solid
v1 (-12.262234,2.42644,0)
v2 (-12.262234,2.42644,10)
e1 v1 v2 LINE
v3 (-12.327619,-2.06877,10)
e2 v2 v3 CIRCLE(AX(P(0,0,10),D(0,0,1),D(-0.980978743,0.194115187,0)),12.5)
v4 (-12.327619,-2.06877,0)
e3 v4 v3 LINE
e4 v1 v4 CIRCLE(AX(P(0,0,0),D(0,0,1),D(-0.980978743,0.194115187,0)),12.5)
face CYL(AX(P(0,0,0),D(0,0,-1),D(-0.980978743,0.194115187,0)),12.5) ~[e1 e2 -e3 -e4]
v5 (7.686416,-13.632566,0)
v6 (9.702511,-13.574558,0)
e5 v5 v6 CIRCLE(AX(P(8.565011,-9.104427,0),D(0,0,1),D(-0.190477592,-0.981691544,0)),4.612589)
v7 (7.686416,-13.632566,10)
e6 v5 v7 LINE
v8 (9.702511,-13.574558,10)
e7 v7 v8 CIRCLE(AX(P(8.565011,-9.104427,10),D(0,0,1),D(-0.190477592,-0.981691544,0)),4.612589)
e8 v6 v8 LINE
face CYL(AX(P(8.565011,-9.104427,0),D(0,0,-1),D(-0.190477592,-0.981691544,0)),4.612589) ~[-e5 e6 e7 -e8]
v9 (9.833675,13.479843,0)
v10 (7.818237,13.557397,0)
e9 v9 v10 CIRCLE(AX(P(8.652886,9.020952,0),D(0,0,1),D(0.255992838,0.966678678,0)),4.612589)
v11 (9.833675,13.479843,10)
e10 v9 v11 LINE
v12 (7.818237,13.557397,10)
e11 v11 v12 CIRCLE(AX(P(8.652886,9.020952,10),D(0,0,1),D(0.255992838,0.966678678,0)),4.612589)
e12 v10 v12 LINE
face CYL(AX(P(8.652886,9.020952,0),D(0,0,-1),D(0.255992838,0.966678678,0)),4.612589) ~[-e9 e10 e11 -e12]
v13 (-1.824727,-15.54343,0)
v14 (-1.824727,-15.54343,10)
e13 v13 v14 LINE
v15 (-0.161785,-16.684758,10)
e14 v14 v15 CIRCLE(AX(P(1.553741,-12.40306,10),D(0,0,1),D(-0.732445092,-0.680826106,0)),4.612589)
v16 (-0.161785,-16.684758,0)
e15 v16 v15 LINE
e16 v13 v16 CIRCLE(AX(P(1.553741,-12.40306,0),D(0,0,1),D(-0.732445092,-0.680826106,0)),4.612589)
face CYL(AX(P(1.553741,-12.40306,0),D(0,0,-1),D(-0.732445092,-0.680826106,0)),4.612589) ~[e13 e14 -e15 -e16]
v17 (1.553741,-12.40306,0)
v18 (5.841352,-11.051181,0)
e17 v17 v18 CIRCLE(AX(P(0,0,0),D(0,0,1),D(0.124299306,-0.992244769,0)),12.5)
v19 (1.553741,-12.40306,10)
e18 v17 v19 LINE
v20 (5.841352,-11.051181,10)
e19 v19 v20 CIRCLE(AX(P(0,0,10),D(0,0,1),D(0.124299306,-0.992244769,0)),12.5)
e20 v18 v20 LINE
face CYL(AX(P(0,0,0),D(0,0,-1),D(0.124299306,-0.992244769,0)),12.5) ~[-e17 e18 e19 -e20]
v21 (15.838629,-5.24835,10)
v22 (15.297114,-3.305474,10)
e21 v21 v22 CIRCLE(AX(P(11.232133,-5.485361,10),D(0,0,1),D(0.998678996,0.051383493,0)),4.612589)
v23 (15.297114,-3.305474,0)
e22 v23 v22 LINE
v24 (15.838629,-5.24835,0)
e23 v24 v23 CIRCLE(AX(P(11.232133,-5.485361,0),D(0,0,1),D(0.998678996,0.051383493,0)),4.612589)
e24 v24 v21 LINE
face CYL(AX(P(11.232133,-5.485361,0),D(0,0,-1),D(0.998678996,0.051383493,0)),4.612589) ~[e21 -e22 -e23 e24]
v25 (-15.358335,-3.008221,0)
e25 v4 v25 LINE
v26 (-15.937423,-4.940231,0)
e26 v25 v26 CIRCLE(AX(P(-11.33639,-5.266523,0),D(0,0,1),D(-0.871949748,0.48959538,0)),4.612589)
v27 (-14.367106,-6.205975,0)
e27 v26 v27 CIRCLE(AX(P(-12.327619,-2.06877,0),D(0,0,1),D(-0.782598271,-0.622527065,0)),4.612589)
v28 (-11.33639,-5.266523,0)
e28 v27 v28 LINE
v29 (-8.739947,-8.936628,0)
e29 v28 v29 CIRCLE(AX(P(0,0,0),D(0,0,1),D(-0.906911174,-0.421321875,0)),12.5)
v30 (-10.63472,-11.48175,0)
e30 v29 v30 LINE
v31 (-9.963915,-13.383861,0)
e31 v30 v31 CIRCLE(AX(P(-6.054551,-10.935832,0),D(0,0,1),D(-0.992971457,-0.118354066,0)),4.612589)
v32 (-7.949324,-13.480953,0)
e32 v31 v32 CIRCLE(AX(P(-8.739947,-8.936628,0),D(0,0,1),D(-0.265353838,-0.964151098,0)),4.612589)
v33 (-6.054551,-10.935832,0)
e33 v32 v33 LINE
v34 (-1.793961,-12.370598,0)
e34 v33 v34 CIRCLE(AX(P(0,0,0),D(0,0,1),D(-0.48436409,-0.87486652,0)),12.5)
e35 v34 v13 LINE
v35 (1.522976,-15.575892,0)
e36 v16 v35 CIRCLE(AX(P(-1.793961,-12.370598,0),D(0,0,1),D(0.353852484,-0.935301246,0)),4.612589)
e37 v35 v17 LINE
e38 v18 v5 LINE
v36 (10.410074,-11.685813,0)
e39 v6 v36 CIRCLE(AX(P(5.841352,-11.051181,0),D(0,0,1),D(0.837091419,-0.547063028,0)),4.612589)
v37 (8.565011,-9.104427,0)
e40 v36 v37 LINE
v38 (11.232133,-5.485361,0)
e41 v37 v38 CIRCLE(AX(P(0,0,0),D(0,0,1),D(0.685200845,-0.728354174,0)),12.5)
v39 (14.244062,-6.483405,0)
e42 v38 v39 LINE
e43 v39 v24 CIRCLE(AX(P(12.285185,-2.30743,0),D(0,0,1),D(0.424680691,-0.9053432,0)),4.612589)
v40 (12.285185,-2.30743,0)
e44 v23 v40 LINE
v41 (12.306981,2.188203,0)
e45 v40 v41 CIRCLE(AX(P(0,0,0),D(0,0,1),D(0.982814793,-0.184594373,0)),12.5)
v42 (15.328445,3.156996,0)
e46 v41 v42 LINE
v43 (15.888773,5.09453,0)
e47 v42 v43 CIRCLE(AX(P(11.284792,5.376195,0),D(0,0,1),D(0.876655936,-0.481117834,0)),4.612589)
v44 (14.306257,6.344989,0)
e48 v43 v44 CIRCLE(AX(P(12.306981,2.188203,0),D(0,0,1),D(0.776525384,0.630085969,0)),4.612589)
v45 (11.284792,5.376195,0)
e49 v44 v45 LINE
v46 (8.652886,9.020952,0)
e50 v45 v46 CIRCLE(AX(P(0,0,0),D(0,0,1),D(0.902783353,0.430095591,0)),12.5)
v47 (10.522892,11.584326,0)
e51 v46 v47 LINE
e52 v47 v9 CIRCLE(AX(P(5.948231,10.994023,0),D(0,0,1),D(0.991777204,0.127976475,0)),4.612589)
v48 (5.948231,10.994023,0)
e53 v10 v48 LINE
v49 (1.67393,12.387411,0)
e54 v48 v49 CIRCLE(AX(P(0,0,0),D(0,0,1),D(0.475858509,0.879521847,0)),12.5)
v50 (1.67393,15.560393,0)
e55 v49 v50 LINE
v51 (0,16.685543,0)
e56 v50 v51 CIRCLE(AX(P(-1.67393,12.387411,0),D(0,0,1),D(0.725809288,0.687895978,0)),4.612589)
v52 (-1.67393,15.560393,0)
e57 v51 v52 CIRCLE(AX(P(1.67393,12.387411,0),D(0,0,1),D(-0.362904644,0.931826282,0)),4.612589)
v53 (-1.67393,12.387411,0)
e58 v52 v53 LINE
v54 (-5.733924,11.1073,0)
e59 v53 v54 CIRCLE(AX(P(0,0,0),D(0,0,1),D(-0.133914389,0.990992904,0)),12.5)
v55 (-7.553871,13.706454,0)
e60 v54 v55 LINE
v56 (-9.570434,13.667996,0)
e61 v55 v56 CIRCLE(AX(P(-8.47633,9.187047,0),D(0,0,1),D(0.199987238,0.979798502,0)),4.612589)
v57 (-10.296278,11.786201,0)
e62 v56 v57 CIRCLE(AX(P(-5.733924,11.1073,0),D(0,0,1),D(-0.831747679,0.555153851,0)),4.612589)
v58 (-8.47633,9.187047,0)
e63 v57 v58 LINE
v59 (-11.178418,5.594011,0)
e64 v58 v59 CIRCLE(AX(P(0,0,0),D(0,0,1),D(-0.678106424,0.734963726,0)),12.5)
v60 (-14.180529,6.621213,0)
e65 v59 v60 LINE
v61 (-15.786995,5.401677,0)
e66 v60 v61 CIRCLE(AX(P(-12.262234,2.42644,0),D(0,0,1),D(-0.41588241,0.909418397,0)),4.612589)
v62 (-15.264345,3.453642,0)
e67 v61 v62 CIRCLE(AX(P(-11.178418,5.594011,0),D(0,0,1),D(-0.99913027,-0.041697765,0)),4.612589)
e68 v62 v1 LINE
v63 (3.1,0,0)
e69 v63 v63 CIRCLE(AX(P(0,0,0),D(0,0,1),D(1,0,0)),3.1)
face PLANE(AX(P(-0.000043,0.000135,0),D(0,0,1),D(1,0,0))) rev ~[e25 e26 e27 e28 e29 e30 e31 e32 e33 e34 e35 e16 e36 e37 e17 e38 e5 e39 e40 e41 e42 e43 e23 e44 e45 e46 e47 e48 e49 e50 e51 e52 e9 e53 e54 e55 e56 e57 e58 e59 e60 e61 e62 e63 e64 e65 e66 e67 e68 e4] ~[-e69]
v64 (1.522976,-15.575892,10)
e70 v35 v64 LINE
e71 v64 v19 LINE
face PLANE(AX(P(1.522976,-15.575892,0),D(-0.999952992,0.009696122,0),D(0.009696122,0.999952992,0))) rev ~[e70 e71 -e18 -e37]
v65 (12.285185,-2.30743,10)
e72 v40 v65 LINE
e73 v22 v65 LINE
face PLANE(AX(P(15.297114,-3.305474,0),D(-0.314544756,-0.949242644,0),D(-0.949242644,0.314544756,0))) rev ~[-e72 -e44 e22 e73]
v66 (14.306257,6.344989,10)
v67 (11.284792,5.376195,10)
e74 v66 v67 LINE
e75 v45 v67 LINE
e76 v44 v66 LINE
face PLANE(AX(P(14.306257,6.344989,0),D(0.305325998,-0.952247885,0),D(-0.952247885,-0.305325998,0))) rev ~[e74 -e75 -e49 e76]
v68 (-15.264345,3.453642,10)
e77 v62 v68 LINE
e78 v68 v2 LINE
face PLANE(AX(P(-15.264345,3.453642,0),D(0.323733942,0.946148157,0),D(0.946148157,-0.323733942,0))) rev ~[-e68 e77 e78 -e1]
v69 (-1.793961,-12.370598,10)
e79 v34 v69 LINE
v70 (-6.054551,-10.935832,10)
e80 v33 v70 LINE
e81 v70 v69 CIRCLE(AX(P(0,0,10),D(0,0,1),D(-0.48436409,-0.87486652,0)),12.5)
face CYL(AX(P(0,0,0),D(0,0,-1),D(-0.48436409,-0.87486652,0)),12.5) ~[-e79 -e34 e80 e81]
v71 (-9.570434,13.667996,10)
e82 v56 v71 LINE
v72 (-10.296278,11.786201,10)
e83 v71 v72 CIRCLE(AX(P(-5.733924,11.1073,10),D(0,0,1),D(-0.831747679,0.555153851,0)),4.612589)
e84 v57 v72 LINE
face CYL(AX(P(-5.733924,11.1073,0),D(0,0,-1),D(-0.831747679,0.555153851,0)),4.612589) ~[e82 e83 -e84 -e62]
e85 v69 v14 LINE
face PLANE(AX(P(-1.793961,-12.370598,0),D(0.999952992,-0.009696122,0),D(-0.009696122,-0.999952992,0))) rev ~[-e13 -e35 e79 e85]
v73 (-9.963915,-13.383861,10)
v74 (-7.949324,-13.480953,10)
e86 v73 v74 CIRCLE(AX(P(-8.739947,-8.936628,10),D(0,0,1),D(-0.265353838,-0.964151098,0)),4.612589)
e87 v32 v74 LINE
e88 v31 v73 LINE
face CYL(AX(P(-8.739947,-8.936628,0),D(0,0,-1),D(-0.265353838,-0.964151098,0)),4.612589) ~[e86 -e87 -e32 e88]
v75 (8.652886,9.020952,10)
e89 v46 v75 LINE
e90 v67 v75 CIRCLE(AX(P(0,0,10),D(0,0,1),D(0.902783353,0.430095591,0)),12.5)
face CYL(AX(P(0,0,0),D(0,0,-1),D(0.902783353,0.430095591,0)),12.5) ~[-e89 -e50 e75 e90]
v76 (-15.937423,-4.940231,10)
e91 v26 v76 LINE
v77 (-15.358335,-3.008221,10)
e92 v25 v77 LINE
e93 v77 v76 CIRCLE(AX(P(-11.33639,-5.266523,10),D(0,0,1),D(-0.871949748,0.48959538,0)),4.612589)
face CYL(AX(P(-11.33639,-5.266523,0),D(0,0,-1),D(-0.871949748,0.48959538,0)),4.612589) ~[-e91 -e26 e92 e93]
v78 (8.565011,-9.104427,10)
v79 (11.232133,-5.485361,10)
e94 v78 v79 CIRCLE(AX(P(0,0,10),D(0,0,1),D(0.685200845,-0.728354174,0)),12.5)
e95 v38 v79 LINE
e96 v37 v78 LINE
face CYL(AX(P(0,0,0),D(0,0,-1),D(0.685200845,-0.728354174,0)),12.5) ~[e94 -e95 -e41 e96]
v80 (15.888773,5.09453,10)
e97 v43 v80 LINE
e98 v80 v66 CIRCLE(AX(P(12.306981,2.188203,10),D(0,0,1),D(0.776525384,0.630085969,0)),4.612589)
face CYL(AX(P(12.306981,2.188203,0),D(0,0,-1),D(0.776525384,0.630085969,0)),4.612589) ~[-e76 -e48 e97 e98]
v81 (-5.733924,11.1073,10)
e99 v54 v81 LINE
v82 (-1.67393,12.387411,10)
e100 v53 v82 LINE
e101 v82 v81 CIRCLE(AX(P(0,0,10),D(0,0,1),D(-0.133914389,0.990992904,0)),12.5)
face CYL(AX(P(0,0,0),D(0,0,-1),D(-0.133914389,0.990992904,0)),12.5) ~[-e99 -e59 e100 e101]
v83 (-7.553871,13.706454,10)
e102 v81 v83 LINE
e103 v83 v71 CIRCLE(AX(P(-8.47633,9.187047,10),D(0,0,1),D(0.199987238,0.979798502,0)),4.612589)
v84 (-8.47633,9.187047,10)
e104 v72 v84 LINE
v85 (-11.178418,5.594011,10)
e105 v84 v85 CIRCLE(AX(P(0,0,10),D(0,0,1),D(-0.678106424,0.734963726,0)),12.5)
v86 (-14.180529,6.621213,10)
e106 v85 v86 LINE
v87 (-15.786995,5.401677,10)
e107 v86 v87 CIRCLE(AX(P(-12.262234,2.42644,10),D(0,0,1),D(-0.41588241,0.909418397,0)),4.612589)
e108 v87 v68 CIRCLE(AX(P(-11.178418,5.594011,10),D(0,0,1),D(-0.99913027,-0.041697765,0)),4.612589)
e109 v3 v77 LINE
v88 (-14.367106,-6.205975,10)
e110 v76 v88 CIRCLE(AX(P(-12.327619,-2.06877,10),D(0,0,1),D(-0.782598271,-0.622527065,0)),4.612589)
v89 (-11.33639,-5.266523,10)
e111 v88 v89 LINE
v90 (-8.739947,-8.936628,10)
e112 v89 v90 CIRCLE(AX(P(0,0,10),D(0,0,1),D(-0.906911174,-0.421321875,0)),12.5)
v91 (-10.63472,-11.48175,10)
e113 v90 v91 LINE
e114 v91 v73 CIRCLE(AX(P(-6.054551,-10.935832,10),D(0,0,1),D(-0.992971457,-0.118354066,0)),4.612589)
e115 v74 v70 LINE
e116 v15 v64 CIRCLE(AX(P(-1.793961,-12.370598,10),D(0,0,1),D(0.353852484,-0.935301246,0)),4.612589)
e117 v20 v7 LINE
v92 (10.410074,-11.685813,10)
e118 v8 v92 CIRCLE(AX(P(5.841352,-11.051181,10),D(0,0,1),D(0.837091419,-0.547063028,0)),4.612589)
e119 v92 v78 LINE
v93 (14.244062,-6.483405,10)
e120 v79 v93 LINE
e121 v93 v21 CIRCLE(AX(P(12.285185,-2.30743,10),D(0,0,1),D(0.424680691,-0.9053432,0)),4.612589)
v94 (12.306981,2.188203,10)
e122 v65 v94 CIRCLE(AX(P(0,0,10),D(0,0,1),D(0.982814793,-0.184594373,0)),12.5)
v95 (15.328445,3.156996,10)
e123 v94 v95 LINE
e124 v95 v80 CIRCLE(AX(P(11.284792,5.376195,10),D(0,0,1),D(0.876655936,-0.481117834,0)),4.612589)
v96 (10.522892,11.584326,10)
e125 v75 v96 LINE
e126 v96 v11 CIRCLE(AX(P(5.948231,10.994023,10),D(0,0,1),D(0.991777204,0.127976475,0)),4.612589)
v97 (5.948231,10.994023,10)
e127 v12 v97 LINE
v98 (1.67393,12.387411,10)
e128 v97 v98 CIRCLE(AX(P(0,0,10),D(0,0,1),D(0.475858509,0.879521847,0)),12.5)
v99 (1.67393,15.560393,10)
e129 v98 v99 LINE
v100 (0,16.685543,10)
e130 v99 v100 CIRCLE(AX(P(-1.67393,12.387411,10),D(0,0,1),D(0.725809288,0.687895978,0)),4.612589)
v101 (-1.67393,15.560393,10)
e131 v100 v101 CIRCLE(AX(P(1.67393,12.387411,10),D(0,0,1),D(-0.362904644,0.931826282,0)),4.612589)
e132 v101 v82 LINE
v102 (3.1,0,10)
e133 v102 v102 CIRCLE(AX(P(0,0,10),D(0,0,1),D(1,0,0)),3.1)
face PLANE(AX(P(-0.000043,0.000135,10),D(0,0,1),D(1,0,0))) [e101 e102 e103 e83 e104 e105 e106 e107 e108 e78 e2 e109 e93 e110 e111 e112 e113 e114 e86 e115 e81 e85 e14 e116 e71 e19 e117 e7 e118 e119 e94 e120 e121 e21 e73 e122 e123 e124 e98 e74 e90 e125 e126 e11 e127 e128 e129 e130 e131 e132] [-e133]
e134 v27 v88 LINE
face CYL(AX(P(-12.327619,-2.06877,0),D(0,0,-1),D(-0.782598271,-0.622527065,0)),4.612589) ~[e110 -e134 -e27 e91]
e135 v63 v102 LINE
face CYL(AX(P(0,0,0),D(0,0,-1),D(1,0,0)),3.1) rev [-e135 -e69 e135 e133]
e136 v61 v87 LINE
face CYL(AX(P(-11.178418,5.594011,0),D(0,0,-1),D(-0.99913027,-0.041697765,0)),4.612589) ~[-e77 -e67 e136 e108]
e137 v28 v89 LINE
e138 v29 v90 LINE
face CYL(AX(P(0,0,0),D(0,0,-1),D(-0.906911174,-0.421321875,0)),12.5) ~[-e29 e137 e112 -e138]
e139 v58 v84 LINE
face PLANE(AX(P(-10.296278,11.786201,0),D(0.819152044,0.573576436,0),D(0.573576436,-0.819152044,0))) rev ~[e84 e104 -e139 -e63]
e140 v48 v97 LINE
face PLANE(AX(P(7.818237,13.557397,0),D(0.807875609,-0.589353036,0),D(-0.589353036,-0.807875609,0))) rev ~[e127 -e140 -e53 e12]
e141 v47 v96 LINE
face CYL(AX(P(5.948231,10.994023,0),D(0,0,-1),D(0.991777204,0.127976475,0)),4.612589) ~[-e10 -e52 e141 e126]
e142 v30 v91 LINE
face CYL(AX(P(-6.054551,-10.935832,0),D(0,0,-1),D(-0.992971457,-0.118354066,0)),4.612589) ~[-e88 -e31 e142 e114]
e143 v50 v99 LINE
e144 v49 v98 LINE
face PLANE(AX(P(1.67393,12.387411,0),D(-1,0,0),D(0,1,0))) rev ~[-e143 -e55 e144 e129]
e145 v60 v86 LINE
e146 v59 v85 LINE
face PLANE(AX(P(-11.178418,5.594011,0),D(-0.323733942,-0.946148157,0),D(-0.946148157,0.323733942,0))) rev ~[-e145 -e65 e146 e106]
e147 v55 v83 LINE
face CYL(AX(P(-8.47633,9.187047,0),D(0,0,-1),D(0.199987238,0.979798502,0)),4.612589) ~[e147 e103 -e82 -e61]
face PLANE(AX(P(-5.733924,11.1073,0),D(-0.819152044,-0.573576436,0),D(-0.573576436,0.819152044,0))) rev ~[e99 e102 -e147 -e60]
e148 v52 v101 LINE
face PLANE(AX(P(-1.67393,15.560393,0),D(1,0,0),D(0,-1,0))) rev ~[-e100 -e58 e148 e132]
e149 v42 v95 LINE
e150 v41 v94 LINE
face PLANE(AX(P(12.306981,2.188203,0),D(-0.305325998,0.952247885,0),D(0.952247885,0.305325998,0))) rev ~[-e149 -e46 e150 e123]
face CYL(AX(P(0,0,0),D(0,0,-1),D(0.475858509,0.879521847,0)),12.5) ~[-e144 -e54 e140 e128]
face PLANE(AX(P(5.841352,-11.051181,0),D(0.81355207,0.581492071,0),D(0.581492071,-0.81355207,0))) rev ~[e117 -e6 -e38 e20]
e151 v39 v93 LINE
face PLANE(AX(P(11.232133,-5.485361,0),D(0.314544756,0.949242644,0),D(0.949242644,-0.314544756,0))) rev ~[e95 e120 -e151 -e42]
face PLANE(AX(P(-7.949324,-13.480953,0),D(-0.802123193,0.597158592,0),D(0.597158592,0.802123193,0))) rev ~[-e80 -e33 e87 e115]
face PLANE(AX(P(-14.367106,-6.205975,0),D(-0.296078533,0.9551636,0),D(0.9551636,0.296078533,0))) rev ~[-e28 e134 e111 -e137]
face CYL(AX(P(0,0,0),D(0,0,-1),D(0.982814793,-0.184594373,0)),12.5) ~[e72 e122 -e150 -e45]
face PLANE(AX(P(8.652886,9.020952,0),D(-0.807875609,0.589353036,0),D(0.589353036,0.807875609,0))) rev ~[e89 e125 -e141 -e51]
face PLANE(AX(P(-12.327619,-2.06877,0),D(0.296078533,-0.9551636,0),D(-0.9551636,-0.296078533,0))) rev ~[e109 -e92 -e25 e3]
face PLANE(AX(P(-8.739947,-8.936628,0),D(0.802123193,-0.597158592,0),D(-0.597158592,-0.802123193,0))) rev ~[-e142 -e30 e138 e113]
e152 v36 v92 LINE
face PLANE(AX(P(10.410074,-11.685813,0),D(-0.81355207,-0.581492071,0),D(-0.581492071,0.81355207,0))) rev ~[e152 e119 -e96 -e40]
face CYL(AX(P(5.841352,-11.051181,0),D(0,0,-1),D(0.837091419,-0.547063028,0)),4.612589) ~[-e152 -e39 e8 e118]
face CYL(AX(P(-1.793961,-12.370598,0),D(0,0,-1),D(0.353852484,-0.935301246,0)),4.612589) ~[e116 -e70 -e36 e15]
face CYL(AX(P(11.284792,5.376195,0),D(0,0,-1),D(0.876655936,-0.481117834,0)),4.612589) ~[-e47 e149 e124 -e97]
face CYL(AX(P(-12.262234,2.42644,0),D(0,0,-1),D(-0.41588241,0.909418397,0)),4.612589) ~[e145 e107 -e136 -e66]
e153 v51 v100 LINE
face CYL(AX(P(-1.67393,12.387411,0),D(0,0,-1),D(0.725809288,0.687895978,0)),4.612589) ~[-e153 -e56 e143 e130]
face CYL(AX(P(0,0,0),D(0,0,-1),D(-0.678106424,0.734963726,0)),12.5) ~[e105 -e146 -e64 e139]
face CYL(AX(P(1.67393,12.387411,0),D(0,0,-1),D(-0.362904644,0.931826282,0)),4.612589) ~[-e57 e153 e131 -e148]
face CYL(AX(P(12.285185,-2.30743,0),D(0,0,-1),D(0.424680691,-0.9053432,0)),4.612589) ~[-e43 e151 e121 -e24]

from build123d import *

# Parameters (mm, degrees)
F0_R     = 3.1
F1_DEPTH = 10


with BuildPart() as f1:
    # F0 (on Top) → F1 (new body)
    with BuildSketch(Plane.XY):
        with BuildLine():
            ThreePointArc((1.673929859, 12.3874113045), (0, 12.5), (-1.673929859, 12.3874113045))
            ThreePointArc((-1.673929859, 12.3874113045), (-3.7588224938, 11.9214618844), (-5.7339241657, 11.1073000167))
            ThreePointArc((-5.7339241657, 11.1073000167), (-7.1697054544, 10.2394005536), (-8.4763302976, 9.1870465703))
            ThreePointArc((-8.4763302976, 9.1870465703), (-9.9902333855, 7.5130045191), (-11.1784184623, 5.5940111443))
            ThreePointArc((-11.1784184623, 5.5940111443), (-11.8268519609, 4.0466742757), (-12.2622342862, 2.4264398427))
            ThreePointArc((-12.2622342862, 2.4264398427), (-12.4986778991, 0.1817987206), (-12.3276190694, -2.0687697022))
            ThreePointArc((-12.3276190694, -2.0687697022), (-11.9395449954, -3.7009816676), (-11.336389674, -5.2665234414))
            ThreePointArc((-11.336389674, -5.2665234414), (-10.2045206414, -7.2192630149), (-8.7399470524, -8.9366283084))
            ThreePointArc((-8.7399470524, -8.9366283084), (-7.4644823963, -10.0265399094), (-6.0545511265, -10.9358315027))
            ThreePointArc((-6.0545511265, -10.9358315027), (-3.9892887467, -11.8463317232), (-1.7939610174, -12.3705983634))
            ThreePointArc((-1.7939610174, -12.3705983634), (-0.1212015211, -12.4994123938), (1.5537413227, -12.4030596186))
            ThreePointArc((1.5537413227, -12.4030596186), (3.7588224938, -11.9214618844), (5.8413523551, -11.0511810529))
            ThreePointArc((5.8413523551, -11.0511810529), (7.2686508911, -10.1694008783), (8.5650105596, -9.1044271711))
            ThreePointArc((8.5650105596, -9.1044271711), (10.0626107657, -7.4157848255), (11.2321331944, -5.4853608726))
            ThreePointArc((11.2321331944, -5.4853608726), (11.8655330447, -3.9318094519), (12.285184913, -2.3074296637))
            ThreePointArc((12.285184913, -2.3074296637), (12.4998530976, -0.0606014727), (12.3069805238, 2.188202547))
            ThreePointArc((12.3069805238, 2.188202547), (11.9030985667, 3.8165749712), (11.2847919153, 5.3761948838))
            ThreePointArc((11.2847919153, 5.3761948838), (10.1340420896, 7.3178679221), (8.6528855651, 9.0209518011))
            ThreePointArc((8.6528855651, 9.0209518011), (7.3669129512, 10.0984451065), (5.9482313582, 10.9940230903))
            ThreePointArc((5.9482313582, 10.9940230903), (3.8742377423, 11.8844554741), (1.673929859, 12.3874113045))
        make_face()
        Circle(F0_R, mode=Mode.SUBTRACT)
        with BuildLine():
            ThreePointArc((-12.2622342862, 2.4264398427), (-11.8268519609, 4.0466742757), (-11.1784184623, 5.5940111443))
            Line((-11.1784184623, 5.5940111443), (-14.1805287895, 6.6212128607))
            ThreePointArc((-14.1805287895, 6.6212128607), (-15.0512360756, 6.1003265438), (-15.786995451, 5.4016765064))
            ThreePointArc((-15.786995451, 5.4016765064), (-15.6334500279, 4.3987420438), (-15.2643446134, 3.4536415591))
            Line((-15.2643446134, 3.4536415591), (-12.2622342862, 2.4264398427))
        make_face()
        with BuildLine():
            ThreePointArc((-11.336389674, -5.2665234414), (-11.9395449954, -3.7009816676), (-12.3276190694, -2.0687697022))
            Line((-12.3276190694, -2.0687697022), (-15.3583352271, -3.0082213265))
            ThreePointArc((-15.3583352271, -3.0082213265), (-15.7547724734, -3.9421866593), (-15.9374230058, -4.9402310051))
            ThreePointArc((-15.9374230058, -4.9402310051), (-15.2222949332, -5.6599848332), (-14.3671058317, -6.2059750657))
            Line((-14.3671058317, -6.2059750657), (-11.336389674, -5.2665234414))
        make_face()
        with BuildLine():
            ThreePointArc((-6.0545511265, -10.9358315027), (-7.4644823963, -10.0265399094), (-8.7399470524, -8.9366283084))
            Line((-8.7399470524, -8.9366283084), (-10.6347200455, -11.4817501301))
            ThreePointArc((-10.6347200455, -11.4817501301), (-10.4045567225, -12.4699194364), (-9.9639151672, -13.3838607655))
            ThreePointArc((-9.9639151672, -13.3838607655), (-8.9619915366, -13.5438694265), (-7.9493241196, -13.4809533245))
            Line((-7.9493241196, -13.4809533245), (-6.0545511265, -10.9358315027))
        make_face()
        with BuildLine():
            ThreePointArc((1.5537413227, -12.4030596186), (-0.1212015211, -12.4994123938), (-1.7939610174, -12.3705983634))
            Line((-1.7939610174, -12.3705983634), (-1.8247266294, -15.5434304201))
            ThreePointArc((-1.8247266294, -15.5434304201), (-1.0564027139, -16.2061008466), (-0.1617850522, -16.6847583155))
            ThreePointArc((-0.1617850522, -16.6847583155), (0.7419462008, -16.2235386762), (1.5229757107, -15.5758916753))
            Line((1.5229757107, -15.5758916753), (1.5537413227, -12.4030596186))
        make_face()
        with BuildLine():
            Line((10.4100739777, -11.6858126065), (8.5650105596, -9.1044271711))
            ThreePointArc((8.5650105596, -9.1044271711), (7.2686508911, -10.1694008783), (5.8413523551, -11.0511810529))
            Line((5.8413523551, -11.0511810529), (7.6864157733, -13.6325664882))
            ThreePointArc((7.6864157733, -13.6325664882), (8.6976727518, -13.71510773), (9.7025107722, -13.5745577889))
            ThreePointArc((9.7025107722, -13.5745577889), (10.1607920135, -12.6693329344), (10.4100739777, -11.6858126065))
        make_face()
        with BuildLine():
            Line((15.2971139884, -3.3054742658), (12.285184913, -2.3074296637))
            ThreePointArc((12.285184913, -2.3074296637), (11.8655330447, -3.9318094519), (11.2321331944, -5.4853608726))
            Line((11.2321331944, -5.4853608726), (14.2440622698, -6.4834054748))
            ThreePointArc((14.2440622698, -6.4834054748), (15.1096780482, -5.9541011602), (15.8386286408, -5.2483499528))
            ThreePointArc((15.8386286408, -5.2483499528), (15.6753658611, -4.2469514318), (15.2971139884, -3.3054742658))
        make_face()
        with BuildLine():
            Line((14.3062565663, 6.3449885386), (11.2847919153, 5.3761948838))
            ThreePointArc((11.2847919153, 5.3761948838), (11.9030985667, 3.8165749712), (12.3069805238, 2.188202547))
            Line((12.3069805238, 2.188202547), (15.3284451748, 3.1569962018))
            ThreePointArc((15.3284451748, 3.1569962018), (15.7158079437, 4.0947615341), (15.8887727305, 5.0945299651))
            ThreePointArc((15.8887727305, 5.0945299651), (15.1666994543, 5.8073159898), (14.3062565663, 6.3449885386))
        make_face()
        with BuildLine():
            Line((7.81823747, 13.5573972192), (5.9482313582, 10.9940230903))
            ThreePointArc((5.9482313582, 10.9940230903), (7.3669129512, 10.0984451065), (8.6528855651, 9.0209518011))
            Line((8.6528855651, 9.0209518011), (10.5228916769, 11.58432593))
            ThreePointArc((10.5228916769, 11.58432593), (10.2831577637, 12.5702170924), (9.833675236, 13.4798429443))
            ThreePointArc((9.833675236, 13.4798429443), (8.8302472408, 13.6301293101), (7.81823747, 13.5573972192))
        make_face()
        with BuildLine():
            Line((-1.673929859, 15.5603925183), (-1.673929859, 12.3874113045))
            ThreePointArc((-1.673929859, 12.3874113045), (0, 12.5), (1.673929859, 12.3874113045))
            Line((1.673929859, 12.3874113045), (1.673929859, 15.5603925183))
            ThreePointArc((1.673929859, 15.5603925183), (0.8992167282, 16.2155820315), (0, 16.6855426777))
            ThreePointArc((0, 16.6855426777), (-0.8992167282, 16.2155820315), (-1.673929859, 15.5603925183))
        make_face()
        with BuildLine():
            ThreePointArc((-8.4763302976, 9.1870465703), (-7.1697054544, 10.2394005536), (-5.7339241657, 11.1073000167))
            Line((-5.7339241657, 11.1073000167), (-7.5538714229, 13.7064540645))
            ThreePointArc((-7.5538714229, 13.7064540645), (-8.5642805338, 13.7987966969), (-9.5704341076, 13.6679963945))
            ThreePointArc((-9.5704341076, 13.6679963945), (-10.0374709761, 12.767257644), (-10.2962775548, 11.7862006181))
            Line((-10.2962775548, 11.7862006181), (-8.4763302976, 9.1870465703))
        make_face()
    extrude(amount=F1_DEPTH)


solid = f1.part
